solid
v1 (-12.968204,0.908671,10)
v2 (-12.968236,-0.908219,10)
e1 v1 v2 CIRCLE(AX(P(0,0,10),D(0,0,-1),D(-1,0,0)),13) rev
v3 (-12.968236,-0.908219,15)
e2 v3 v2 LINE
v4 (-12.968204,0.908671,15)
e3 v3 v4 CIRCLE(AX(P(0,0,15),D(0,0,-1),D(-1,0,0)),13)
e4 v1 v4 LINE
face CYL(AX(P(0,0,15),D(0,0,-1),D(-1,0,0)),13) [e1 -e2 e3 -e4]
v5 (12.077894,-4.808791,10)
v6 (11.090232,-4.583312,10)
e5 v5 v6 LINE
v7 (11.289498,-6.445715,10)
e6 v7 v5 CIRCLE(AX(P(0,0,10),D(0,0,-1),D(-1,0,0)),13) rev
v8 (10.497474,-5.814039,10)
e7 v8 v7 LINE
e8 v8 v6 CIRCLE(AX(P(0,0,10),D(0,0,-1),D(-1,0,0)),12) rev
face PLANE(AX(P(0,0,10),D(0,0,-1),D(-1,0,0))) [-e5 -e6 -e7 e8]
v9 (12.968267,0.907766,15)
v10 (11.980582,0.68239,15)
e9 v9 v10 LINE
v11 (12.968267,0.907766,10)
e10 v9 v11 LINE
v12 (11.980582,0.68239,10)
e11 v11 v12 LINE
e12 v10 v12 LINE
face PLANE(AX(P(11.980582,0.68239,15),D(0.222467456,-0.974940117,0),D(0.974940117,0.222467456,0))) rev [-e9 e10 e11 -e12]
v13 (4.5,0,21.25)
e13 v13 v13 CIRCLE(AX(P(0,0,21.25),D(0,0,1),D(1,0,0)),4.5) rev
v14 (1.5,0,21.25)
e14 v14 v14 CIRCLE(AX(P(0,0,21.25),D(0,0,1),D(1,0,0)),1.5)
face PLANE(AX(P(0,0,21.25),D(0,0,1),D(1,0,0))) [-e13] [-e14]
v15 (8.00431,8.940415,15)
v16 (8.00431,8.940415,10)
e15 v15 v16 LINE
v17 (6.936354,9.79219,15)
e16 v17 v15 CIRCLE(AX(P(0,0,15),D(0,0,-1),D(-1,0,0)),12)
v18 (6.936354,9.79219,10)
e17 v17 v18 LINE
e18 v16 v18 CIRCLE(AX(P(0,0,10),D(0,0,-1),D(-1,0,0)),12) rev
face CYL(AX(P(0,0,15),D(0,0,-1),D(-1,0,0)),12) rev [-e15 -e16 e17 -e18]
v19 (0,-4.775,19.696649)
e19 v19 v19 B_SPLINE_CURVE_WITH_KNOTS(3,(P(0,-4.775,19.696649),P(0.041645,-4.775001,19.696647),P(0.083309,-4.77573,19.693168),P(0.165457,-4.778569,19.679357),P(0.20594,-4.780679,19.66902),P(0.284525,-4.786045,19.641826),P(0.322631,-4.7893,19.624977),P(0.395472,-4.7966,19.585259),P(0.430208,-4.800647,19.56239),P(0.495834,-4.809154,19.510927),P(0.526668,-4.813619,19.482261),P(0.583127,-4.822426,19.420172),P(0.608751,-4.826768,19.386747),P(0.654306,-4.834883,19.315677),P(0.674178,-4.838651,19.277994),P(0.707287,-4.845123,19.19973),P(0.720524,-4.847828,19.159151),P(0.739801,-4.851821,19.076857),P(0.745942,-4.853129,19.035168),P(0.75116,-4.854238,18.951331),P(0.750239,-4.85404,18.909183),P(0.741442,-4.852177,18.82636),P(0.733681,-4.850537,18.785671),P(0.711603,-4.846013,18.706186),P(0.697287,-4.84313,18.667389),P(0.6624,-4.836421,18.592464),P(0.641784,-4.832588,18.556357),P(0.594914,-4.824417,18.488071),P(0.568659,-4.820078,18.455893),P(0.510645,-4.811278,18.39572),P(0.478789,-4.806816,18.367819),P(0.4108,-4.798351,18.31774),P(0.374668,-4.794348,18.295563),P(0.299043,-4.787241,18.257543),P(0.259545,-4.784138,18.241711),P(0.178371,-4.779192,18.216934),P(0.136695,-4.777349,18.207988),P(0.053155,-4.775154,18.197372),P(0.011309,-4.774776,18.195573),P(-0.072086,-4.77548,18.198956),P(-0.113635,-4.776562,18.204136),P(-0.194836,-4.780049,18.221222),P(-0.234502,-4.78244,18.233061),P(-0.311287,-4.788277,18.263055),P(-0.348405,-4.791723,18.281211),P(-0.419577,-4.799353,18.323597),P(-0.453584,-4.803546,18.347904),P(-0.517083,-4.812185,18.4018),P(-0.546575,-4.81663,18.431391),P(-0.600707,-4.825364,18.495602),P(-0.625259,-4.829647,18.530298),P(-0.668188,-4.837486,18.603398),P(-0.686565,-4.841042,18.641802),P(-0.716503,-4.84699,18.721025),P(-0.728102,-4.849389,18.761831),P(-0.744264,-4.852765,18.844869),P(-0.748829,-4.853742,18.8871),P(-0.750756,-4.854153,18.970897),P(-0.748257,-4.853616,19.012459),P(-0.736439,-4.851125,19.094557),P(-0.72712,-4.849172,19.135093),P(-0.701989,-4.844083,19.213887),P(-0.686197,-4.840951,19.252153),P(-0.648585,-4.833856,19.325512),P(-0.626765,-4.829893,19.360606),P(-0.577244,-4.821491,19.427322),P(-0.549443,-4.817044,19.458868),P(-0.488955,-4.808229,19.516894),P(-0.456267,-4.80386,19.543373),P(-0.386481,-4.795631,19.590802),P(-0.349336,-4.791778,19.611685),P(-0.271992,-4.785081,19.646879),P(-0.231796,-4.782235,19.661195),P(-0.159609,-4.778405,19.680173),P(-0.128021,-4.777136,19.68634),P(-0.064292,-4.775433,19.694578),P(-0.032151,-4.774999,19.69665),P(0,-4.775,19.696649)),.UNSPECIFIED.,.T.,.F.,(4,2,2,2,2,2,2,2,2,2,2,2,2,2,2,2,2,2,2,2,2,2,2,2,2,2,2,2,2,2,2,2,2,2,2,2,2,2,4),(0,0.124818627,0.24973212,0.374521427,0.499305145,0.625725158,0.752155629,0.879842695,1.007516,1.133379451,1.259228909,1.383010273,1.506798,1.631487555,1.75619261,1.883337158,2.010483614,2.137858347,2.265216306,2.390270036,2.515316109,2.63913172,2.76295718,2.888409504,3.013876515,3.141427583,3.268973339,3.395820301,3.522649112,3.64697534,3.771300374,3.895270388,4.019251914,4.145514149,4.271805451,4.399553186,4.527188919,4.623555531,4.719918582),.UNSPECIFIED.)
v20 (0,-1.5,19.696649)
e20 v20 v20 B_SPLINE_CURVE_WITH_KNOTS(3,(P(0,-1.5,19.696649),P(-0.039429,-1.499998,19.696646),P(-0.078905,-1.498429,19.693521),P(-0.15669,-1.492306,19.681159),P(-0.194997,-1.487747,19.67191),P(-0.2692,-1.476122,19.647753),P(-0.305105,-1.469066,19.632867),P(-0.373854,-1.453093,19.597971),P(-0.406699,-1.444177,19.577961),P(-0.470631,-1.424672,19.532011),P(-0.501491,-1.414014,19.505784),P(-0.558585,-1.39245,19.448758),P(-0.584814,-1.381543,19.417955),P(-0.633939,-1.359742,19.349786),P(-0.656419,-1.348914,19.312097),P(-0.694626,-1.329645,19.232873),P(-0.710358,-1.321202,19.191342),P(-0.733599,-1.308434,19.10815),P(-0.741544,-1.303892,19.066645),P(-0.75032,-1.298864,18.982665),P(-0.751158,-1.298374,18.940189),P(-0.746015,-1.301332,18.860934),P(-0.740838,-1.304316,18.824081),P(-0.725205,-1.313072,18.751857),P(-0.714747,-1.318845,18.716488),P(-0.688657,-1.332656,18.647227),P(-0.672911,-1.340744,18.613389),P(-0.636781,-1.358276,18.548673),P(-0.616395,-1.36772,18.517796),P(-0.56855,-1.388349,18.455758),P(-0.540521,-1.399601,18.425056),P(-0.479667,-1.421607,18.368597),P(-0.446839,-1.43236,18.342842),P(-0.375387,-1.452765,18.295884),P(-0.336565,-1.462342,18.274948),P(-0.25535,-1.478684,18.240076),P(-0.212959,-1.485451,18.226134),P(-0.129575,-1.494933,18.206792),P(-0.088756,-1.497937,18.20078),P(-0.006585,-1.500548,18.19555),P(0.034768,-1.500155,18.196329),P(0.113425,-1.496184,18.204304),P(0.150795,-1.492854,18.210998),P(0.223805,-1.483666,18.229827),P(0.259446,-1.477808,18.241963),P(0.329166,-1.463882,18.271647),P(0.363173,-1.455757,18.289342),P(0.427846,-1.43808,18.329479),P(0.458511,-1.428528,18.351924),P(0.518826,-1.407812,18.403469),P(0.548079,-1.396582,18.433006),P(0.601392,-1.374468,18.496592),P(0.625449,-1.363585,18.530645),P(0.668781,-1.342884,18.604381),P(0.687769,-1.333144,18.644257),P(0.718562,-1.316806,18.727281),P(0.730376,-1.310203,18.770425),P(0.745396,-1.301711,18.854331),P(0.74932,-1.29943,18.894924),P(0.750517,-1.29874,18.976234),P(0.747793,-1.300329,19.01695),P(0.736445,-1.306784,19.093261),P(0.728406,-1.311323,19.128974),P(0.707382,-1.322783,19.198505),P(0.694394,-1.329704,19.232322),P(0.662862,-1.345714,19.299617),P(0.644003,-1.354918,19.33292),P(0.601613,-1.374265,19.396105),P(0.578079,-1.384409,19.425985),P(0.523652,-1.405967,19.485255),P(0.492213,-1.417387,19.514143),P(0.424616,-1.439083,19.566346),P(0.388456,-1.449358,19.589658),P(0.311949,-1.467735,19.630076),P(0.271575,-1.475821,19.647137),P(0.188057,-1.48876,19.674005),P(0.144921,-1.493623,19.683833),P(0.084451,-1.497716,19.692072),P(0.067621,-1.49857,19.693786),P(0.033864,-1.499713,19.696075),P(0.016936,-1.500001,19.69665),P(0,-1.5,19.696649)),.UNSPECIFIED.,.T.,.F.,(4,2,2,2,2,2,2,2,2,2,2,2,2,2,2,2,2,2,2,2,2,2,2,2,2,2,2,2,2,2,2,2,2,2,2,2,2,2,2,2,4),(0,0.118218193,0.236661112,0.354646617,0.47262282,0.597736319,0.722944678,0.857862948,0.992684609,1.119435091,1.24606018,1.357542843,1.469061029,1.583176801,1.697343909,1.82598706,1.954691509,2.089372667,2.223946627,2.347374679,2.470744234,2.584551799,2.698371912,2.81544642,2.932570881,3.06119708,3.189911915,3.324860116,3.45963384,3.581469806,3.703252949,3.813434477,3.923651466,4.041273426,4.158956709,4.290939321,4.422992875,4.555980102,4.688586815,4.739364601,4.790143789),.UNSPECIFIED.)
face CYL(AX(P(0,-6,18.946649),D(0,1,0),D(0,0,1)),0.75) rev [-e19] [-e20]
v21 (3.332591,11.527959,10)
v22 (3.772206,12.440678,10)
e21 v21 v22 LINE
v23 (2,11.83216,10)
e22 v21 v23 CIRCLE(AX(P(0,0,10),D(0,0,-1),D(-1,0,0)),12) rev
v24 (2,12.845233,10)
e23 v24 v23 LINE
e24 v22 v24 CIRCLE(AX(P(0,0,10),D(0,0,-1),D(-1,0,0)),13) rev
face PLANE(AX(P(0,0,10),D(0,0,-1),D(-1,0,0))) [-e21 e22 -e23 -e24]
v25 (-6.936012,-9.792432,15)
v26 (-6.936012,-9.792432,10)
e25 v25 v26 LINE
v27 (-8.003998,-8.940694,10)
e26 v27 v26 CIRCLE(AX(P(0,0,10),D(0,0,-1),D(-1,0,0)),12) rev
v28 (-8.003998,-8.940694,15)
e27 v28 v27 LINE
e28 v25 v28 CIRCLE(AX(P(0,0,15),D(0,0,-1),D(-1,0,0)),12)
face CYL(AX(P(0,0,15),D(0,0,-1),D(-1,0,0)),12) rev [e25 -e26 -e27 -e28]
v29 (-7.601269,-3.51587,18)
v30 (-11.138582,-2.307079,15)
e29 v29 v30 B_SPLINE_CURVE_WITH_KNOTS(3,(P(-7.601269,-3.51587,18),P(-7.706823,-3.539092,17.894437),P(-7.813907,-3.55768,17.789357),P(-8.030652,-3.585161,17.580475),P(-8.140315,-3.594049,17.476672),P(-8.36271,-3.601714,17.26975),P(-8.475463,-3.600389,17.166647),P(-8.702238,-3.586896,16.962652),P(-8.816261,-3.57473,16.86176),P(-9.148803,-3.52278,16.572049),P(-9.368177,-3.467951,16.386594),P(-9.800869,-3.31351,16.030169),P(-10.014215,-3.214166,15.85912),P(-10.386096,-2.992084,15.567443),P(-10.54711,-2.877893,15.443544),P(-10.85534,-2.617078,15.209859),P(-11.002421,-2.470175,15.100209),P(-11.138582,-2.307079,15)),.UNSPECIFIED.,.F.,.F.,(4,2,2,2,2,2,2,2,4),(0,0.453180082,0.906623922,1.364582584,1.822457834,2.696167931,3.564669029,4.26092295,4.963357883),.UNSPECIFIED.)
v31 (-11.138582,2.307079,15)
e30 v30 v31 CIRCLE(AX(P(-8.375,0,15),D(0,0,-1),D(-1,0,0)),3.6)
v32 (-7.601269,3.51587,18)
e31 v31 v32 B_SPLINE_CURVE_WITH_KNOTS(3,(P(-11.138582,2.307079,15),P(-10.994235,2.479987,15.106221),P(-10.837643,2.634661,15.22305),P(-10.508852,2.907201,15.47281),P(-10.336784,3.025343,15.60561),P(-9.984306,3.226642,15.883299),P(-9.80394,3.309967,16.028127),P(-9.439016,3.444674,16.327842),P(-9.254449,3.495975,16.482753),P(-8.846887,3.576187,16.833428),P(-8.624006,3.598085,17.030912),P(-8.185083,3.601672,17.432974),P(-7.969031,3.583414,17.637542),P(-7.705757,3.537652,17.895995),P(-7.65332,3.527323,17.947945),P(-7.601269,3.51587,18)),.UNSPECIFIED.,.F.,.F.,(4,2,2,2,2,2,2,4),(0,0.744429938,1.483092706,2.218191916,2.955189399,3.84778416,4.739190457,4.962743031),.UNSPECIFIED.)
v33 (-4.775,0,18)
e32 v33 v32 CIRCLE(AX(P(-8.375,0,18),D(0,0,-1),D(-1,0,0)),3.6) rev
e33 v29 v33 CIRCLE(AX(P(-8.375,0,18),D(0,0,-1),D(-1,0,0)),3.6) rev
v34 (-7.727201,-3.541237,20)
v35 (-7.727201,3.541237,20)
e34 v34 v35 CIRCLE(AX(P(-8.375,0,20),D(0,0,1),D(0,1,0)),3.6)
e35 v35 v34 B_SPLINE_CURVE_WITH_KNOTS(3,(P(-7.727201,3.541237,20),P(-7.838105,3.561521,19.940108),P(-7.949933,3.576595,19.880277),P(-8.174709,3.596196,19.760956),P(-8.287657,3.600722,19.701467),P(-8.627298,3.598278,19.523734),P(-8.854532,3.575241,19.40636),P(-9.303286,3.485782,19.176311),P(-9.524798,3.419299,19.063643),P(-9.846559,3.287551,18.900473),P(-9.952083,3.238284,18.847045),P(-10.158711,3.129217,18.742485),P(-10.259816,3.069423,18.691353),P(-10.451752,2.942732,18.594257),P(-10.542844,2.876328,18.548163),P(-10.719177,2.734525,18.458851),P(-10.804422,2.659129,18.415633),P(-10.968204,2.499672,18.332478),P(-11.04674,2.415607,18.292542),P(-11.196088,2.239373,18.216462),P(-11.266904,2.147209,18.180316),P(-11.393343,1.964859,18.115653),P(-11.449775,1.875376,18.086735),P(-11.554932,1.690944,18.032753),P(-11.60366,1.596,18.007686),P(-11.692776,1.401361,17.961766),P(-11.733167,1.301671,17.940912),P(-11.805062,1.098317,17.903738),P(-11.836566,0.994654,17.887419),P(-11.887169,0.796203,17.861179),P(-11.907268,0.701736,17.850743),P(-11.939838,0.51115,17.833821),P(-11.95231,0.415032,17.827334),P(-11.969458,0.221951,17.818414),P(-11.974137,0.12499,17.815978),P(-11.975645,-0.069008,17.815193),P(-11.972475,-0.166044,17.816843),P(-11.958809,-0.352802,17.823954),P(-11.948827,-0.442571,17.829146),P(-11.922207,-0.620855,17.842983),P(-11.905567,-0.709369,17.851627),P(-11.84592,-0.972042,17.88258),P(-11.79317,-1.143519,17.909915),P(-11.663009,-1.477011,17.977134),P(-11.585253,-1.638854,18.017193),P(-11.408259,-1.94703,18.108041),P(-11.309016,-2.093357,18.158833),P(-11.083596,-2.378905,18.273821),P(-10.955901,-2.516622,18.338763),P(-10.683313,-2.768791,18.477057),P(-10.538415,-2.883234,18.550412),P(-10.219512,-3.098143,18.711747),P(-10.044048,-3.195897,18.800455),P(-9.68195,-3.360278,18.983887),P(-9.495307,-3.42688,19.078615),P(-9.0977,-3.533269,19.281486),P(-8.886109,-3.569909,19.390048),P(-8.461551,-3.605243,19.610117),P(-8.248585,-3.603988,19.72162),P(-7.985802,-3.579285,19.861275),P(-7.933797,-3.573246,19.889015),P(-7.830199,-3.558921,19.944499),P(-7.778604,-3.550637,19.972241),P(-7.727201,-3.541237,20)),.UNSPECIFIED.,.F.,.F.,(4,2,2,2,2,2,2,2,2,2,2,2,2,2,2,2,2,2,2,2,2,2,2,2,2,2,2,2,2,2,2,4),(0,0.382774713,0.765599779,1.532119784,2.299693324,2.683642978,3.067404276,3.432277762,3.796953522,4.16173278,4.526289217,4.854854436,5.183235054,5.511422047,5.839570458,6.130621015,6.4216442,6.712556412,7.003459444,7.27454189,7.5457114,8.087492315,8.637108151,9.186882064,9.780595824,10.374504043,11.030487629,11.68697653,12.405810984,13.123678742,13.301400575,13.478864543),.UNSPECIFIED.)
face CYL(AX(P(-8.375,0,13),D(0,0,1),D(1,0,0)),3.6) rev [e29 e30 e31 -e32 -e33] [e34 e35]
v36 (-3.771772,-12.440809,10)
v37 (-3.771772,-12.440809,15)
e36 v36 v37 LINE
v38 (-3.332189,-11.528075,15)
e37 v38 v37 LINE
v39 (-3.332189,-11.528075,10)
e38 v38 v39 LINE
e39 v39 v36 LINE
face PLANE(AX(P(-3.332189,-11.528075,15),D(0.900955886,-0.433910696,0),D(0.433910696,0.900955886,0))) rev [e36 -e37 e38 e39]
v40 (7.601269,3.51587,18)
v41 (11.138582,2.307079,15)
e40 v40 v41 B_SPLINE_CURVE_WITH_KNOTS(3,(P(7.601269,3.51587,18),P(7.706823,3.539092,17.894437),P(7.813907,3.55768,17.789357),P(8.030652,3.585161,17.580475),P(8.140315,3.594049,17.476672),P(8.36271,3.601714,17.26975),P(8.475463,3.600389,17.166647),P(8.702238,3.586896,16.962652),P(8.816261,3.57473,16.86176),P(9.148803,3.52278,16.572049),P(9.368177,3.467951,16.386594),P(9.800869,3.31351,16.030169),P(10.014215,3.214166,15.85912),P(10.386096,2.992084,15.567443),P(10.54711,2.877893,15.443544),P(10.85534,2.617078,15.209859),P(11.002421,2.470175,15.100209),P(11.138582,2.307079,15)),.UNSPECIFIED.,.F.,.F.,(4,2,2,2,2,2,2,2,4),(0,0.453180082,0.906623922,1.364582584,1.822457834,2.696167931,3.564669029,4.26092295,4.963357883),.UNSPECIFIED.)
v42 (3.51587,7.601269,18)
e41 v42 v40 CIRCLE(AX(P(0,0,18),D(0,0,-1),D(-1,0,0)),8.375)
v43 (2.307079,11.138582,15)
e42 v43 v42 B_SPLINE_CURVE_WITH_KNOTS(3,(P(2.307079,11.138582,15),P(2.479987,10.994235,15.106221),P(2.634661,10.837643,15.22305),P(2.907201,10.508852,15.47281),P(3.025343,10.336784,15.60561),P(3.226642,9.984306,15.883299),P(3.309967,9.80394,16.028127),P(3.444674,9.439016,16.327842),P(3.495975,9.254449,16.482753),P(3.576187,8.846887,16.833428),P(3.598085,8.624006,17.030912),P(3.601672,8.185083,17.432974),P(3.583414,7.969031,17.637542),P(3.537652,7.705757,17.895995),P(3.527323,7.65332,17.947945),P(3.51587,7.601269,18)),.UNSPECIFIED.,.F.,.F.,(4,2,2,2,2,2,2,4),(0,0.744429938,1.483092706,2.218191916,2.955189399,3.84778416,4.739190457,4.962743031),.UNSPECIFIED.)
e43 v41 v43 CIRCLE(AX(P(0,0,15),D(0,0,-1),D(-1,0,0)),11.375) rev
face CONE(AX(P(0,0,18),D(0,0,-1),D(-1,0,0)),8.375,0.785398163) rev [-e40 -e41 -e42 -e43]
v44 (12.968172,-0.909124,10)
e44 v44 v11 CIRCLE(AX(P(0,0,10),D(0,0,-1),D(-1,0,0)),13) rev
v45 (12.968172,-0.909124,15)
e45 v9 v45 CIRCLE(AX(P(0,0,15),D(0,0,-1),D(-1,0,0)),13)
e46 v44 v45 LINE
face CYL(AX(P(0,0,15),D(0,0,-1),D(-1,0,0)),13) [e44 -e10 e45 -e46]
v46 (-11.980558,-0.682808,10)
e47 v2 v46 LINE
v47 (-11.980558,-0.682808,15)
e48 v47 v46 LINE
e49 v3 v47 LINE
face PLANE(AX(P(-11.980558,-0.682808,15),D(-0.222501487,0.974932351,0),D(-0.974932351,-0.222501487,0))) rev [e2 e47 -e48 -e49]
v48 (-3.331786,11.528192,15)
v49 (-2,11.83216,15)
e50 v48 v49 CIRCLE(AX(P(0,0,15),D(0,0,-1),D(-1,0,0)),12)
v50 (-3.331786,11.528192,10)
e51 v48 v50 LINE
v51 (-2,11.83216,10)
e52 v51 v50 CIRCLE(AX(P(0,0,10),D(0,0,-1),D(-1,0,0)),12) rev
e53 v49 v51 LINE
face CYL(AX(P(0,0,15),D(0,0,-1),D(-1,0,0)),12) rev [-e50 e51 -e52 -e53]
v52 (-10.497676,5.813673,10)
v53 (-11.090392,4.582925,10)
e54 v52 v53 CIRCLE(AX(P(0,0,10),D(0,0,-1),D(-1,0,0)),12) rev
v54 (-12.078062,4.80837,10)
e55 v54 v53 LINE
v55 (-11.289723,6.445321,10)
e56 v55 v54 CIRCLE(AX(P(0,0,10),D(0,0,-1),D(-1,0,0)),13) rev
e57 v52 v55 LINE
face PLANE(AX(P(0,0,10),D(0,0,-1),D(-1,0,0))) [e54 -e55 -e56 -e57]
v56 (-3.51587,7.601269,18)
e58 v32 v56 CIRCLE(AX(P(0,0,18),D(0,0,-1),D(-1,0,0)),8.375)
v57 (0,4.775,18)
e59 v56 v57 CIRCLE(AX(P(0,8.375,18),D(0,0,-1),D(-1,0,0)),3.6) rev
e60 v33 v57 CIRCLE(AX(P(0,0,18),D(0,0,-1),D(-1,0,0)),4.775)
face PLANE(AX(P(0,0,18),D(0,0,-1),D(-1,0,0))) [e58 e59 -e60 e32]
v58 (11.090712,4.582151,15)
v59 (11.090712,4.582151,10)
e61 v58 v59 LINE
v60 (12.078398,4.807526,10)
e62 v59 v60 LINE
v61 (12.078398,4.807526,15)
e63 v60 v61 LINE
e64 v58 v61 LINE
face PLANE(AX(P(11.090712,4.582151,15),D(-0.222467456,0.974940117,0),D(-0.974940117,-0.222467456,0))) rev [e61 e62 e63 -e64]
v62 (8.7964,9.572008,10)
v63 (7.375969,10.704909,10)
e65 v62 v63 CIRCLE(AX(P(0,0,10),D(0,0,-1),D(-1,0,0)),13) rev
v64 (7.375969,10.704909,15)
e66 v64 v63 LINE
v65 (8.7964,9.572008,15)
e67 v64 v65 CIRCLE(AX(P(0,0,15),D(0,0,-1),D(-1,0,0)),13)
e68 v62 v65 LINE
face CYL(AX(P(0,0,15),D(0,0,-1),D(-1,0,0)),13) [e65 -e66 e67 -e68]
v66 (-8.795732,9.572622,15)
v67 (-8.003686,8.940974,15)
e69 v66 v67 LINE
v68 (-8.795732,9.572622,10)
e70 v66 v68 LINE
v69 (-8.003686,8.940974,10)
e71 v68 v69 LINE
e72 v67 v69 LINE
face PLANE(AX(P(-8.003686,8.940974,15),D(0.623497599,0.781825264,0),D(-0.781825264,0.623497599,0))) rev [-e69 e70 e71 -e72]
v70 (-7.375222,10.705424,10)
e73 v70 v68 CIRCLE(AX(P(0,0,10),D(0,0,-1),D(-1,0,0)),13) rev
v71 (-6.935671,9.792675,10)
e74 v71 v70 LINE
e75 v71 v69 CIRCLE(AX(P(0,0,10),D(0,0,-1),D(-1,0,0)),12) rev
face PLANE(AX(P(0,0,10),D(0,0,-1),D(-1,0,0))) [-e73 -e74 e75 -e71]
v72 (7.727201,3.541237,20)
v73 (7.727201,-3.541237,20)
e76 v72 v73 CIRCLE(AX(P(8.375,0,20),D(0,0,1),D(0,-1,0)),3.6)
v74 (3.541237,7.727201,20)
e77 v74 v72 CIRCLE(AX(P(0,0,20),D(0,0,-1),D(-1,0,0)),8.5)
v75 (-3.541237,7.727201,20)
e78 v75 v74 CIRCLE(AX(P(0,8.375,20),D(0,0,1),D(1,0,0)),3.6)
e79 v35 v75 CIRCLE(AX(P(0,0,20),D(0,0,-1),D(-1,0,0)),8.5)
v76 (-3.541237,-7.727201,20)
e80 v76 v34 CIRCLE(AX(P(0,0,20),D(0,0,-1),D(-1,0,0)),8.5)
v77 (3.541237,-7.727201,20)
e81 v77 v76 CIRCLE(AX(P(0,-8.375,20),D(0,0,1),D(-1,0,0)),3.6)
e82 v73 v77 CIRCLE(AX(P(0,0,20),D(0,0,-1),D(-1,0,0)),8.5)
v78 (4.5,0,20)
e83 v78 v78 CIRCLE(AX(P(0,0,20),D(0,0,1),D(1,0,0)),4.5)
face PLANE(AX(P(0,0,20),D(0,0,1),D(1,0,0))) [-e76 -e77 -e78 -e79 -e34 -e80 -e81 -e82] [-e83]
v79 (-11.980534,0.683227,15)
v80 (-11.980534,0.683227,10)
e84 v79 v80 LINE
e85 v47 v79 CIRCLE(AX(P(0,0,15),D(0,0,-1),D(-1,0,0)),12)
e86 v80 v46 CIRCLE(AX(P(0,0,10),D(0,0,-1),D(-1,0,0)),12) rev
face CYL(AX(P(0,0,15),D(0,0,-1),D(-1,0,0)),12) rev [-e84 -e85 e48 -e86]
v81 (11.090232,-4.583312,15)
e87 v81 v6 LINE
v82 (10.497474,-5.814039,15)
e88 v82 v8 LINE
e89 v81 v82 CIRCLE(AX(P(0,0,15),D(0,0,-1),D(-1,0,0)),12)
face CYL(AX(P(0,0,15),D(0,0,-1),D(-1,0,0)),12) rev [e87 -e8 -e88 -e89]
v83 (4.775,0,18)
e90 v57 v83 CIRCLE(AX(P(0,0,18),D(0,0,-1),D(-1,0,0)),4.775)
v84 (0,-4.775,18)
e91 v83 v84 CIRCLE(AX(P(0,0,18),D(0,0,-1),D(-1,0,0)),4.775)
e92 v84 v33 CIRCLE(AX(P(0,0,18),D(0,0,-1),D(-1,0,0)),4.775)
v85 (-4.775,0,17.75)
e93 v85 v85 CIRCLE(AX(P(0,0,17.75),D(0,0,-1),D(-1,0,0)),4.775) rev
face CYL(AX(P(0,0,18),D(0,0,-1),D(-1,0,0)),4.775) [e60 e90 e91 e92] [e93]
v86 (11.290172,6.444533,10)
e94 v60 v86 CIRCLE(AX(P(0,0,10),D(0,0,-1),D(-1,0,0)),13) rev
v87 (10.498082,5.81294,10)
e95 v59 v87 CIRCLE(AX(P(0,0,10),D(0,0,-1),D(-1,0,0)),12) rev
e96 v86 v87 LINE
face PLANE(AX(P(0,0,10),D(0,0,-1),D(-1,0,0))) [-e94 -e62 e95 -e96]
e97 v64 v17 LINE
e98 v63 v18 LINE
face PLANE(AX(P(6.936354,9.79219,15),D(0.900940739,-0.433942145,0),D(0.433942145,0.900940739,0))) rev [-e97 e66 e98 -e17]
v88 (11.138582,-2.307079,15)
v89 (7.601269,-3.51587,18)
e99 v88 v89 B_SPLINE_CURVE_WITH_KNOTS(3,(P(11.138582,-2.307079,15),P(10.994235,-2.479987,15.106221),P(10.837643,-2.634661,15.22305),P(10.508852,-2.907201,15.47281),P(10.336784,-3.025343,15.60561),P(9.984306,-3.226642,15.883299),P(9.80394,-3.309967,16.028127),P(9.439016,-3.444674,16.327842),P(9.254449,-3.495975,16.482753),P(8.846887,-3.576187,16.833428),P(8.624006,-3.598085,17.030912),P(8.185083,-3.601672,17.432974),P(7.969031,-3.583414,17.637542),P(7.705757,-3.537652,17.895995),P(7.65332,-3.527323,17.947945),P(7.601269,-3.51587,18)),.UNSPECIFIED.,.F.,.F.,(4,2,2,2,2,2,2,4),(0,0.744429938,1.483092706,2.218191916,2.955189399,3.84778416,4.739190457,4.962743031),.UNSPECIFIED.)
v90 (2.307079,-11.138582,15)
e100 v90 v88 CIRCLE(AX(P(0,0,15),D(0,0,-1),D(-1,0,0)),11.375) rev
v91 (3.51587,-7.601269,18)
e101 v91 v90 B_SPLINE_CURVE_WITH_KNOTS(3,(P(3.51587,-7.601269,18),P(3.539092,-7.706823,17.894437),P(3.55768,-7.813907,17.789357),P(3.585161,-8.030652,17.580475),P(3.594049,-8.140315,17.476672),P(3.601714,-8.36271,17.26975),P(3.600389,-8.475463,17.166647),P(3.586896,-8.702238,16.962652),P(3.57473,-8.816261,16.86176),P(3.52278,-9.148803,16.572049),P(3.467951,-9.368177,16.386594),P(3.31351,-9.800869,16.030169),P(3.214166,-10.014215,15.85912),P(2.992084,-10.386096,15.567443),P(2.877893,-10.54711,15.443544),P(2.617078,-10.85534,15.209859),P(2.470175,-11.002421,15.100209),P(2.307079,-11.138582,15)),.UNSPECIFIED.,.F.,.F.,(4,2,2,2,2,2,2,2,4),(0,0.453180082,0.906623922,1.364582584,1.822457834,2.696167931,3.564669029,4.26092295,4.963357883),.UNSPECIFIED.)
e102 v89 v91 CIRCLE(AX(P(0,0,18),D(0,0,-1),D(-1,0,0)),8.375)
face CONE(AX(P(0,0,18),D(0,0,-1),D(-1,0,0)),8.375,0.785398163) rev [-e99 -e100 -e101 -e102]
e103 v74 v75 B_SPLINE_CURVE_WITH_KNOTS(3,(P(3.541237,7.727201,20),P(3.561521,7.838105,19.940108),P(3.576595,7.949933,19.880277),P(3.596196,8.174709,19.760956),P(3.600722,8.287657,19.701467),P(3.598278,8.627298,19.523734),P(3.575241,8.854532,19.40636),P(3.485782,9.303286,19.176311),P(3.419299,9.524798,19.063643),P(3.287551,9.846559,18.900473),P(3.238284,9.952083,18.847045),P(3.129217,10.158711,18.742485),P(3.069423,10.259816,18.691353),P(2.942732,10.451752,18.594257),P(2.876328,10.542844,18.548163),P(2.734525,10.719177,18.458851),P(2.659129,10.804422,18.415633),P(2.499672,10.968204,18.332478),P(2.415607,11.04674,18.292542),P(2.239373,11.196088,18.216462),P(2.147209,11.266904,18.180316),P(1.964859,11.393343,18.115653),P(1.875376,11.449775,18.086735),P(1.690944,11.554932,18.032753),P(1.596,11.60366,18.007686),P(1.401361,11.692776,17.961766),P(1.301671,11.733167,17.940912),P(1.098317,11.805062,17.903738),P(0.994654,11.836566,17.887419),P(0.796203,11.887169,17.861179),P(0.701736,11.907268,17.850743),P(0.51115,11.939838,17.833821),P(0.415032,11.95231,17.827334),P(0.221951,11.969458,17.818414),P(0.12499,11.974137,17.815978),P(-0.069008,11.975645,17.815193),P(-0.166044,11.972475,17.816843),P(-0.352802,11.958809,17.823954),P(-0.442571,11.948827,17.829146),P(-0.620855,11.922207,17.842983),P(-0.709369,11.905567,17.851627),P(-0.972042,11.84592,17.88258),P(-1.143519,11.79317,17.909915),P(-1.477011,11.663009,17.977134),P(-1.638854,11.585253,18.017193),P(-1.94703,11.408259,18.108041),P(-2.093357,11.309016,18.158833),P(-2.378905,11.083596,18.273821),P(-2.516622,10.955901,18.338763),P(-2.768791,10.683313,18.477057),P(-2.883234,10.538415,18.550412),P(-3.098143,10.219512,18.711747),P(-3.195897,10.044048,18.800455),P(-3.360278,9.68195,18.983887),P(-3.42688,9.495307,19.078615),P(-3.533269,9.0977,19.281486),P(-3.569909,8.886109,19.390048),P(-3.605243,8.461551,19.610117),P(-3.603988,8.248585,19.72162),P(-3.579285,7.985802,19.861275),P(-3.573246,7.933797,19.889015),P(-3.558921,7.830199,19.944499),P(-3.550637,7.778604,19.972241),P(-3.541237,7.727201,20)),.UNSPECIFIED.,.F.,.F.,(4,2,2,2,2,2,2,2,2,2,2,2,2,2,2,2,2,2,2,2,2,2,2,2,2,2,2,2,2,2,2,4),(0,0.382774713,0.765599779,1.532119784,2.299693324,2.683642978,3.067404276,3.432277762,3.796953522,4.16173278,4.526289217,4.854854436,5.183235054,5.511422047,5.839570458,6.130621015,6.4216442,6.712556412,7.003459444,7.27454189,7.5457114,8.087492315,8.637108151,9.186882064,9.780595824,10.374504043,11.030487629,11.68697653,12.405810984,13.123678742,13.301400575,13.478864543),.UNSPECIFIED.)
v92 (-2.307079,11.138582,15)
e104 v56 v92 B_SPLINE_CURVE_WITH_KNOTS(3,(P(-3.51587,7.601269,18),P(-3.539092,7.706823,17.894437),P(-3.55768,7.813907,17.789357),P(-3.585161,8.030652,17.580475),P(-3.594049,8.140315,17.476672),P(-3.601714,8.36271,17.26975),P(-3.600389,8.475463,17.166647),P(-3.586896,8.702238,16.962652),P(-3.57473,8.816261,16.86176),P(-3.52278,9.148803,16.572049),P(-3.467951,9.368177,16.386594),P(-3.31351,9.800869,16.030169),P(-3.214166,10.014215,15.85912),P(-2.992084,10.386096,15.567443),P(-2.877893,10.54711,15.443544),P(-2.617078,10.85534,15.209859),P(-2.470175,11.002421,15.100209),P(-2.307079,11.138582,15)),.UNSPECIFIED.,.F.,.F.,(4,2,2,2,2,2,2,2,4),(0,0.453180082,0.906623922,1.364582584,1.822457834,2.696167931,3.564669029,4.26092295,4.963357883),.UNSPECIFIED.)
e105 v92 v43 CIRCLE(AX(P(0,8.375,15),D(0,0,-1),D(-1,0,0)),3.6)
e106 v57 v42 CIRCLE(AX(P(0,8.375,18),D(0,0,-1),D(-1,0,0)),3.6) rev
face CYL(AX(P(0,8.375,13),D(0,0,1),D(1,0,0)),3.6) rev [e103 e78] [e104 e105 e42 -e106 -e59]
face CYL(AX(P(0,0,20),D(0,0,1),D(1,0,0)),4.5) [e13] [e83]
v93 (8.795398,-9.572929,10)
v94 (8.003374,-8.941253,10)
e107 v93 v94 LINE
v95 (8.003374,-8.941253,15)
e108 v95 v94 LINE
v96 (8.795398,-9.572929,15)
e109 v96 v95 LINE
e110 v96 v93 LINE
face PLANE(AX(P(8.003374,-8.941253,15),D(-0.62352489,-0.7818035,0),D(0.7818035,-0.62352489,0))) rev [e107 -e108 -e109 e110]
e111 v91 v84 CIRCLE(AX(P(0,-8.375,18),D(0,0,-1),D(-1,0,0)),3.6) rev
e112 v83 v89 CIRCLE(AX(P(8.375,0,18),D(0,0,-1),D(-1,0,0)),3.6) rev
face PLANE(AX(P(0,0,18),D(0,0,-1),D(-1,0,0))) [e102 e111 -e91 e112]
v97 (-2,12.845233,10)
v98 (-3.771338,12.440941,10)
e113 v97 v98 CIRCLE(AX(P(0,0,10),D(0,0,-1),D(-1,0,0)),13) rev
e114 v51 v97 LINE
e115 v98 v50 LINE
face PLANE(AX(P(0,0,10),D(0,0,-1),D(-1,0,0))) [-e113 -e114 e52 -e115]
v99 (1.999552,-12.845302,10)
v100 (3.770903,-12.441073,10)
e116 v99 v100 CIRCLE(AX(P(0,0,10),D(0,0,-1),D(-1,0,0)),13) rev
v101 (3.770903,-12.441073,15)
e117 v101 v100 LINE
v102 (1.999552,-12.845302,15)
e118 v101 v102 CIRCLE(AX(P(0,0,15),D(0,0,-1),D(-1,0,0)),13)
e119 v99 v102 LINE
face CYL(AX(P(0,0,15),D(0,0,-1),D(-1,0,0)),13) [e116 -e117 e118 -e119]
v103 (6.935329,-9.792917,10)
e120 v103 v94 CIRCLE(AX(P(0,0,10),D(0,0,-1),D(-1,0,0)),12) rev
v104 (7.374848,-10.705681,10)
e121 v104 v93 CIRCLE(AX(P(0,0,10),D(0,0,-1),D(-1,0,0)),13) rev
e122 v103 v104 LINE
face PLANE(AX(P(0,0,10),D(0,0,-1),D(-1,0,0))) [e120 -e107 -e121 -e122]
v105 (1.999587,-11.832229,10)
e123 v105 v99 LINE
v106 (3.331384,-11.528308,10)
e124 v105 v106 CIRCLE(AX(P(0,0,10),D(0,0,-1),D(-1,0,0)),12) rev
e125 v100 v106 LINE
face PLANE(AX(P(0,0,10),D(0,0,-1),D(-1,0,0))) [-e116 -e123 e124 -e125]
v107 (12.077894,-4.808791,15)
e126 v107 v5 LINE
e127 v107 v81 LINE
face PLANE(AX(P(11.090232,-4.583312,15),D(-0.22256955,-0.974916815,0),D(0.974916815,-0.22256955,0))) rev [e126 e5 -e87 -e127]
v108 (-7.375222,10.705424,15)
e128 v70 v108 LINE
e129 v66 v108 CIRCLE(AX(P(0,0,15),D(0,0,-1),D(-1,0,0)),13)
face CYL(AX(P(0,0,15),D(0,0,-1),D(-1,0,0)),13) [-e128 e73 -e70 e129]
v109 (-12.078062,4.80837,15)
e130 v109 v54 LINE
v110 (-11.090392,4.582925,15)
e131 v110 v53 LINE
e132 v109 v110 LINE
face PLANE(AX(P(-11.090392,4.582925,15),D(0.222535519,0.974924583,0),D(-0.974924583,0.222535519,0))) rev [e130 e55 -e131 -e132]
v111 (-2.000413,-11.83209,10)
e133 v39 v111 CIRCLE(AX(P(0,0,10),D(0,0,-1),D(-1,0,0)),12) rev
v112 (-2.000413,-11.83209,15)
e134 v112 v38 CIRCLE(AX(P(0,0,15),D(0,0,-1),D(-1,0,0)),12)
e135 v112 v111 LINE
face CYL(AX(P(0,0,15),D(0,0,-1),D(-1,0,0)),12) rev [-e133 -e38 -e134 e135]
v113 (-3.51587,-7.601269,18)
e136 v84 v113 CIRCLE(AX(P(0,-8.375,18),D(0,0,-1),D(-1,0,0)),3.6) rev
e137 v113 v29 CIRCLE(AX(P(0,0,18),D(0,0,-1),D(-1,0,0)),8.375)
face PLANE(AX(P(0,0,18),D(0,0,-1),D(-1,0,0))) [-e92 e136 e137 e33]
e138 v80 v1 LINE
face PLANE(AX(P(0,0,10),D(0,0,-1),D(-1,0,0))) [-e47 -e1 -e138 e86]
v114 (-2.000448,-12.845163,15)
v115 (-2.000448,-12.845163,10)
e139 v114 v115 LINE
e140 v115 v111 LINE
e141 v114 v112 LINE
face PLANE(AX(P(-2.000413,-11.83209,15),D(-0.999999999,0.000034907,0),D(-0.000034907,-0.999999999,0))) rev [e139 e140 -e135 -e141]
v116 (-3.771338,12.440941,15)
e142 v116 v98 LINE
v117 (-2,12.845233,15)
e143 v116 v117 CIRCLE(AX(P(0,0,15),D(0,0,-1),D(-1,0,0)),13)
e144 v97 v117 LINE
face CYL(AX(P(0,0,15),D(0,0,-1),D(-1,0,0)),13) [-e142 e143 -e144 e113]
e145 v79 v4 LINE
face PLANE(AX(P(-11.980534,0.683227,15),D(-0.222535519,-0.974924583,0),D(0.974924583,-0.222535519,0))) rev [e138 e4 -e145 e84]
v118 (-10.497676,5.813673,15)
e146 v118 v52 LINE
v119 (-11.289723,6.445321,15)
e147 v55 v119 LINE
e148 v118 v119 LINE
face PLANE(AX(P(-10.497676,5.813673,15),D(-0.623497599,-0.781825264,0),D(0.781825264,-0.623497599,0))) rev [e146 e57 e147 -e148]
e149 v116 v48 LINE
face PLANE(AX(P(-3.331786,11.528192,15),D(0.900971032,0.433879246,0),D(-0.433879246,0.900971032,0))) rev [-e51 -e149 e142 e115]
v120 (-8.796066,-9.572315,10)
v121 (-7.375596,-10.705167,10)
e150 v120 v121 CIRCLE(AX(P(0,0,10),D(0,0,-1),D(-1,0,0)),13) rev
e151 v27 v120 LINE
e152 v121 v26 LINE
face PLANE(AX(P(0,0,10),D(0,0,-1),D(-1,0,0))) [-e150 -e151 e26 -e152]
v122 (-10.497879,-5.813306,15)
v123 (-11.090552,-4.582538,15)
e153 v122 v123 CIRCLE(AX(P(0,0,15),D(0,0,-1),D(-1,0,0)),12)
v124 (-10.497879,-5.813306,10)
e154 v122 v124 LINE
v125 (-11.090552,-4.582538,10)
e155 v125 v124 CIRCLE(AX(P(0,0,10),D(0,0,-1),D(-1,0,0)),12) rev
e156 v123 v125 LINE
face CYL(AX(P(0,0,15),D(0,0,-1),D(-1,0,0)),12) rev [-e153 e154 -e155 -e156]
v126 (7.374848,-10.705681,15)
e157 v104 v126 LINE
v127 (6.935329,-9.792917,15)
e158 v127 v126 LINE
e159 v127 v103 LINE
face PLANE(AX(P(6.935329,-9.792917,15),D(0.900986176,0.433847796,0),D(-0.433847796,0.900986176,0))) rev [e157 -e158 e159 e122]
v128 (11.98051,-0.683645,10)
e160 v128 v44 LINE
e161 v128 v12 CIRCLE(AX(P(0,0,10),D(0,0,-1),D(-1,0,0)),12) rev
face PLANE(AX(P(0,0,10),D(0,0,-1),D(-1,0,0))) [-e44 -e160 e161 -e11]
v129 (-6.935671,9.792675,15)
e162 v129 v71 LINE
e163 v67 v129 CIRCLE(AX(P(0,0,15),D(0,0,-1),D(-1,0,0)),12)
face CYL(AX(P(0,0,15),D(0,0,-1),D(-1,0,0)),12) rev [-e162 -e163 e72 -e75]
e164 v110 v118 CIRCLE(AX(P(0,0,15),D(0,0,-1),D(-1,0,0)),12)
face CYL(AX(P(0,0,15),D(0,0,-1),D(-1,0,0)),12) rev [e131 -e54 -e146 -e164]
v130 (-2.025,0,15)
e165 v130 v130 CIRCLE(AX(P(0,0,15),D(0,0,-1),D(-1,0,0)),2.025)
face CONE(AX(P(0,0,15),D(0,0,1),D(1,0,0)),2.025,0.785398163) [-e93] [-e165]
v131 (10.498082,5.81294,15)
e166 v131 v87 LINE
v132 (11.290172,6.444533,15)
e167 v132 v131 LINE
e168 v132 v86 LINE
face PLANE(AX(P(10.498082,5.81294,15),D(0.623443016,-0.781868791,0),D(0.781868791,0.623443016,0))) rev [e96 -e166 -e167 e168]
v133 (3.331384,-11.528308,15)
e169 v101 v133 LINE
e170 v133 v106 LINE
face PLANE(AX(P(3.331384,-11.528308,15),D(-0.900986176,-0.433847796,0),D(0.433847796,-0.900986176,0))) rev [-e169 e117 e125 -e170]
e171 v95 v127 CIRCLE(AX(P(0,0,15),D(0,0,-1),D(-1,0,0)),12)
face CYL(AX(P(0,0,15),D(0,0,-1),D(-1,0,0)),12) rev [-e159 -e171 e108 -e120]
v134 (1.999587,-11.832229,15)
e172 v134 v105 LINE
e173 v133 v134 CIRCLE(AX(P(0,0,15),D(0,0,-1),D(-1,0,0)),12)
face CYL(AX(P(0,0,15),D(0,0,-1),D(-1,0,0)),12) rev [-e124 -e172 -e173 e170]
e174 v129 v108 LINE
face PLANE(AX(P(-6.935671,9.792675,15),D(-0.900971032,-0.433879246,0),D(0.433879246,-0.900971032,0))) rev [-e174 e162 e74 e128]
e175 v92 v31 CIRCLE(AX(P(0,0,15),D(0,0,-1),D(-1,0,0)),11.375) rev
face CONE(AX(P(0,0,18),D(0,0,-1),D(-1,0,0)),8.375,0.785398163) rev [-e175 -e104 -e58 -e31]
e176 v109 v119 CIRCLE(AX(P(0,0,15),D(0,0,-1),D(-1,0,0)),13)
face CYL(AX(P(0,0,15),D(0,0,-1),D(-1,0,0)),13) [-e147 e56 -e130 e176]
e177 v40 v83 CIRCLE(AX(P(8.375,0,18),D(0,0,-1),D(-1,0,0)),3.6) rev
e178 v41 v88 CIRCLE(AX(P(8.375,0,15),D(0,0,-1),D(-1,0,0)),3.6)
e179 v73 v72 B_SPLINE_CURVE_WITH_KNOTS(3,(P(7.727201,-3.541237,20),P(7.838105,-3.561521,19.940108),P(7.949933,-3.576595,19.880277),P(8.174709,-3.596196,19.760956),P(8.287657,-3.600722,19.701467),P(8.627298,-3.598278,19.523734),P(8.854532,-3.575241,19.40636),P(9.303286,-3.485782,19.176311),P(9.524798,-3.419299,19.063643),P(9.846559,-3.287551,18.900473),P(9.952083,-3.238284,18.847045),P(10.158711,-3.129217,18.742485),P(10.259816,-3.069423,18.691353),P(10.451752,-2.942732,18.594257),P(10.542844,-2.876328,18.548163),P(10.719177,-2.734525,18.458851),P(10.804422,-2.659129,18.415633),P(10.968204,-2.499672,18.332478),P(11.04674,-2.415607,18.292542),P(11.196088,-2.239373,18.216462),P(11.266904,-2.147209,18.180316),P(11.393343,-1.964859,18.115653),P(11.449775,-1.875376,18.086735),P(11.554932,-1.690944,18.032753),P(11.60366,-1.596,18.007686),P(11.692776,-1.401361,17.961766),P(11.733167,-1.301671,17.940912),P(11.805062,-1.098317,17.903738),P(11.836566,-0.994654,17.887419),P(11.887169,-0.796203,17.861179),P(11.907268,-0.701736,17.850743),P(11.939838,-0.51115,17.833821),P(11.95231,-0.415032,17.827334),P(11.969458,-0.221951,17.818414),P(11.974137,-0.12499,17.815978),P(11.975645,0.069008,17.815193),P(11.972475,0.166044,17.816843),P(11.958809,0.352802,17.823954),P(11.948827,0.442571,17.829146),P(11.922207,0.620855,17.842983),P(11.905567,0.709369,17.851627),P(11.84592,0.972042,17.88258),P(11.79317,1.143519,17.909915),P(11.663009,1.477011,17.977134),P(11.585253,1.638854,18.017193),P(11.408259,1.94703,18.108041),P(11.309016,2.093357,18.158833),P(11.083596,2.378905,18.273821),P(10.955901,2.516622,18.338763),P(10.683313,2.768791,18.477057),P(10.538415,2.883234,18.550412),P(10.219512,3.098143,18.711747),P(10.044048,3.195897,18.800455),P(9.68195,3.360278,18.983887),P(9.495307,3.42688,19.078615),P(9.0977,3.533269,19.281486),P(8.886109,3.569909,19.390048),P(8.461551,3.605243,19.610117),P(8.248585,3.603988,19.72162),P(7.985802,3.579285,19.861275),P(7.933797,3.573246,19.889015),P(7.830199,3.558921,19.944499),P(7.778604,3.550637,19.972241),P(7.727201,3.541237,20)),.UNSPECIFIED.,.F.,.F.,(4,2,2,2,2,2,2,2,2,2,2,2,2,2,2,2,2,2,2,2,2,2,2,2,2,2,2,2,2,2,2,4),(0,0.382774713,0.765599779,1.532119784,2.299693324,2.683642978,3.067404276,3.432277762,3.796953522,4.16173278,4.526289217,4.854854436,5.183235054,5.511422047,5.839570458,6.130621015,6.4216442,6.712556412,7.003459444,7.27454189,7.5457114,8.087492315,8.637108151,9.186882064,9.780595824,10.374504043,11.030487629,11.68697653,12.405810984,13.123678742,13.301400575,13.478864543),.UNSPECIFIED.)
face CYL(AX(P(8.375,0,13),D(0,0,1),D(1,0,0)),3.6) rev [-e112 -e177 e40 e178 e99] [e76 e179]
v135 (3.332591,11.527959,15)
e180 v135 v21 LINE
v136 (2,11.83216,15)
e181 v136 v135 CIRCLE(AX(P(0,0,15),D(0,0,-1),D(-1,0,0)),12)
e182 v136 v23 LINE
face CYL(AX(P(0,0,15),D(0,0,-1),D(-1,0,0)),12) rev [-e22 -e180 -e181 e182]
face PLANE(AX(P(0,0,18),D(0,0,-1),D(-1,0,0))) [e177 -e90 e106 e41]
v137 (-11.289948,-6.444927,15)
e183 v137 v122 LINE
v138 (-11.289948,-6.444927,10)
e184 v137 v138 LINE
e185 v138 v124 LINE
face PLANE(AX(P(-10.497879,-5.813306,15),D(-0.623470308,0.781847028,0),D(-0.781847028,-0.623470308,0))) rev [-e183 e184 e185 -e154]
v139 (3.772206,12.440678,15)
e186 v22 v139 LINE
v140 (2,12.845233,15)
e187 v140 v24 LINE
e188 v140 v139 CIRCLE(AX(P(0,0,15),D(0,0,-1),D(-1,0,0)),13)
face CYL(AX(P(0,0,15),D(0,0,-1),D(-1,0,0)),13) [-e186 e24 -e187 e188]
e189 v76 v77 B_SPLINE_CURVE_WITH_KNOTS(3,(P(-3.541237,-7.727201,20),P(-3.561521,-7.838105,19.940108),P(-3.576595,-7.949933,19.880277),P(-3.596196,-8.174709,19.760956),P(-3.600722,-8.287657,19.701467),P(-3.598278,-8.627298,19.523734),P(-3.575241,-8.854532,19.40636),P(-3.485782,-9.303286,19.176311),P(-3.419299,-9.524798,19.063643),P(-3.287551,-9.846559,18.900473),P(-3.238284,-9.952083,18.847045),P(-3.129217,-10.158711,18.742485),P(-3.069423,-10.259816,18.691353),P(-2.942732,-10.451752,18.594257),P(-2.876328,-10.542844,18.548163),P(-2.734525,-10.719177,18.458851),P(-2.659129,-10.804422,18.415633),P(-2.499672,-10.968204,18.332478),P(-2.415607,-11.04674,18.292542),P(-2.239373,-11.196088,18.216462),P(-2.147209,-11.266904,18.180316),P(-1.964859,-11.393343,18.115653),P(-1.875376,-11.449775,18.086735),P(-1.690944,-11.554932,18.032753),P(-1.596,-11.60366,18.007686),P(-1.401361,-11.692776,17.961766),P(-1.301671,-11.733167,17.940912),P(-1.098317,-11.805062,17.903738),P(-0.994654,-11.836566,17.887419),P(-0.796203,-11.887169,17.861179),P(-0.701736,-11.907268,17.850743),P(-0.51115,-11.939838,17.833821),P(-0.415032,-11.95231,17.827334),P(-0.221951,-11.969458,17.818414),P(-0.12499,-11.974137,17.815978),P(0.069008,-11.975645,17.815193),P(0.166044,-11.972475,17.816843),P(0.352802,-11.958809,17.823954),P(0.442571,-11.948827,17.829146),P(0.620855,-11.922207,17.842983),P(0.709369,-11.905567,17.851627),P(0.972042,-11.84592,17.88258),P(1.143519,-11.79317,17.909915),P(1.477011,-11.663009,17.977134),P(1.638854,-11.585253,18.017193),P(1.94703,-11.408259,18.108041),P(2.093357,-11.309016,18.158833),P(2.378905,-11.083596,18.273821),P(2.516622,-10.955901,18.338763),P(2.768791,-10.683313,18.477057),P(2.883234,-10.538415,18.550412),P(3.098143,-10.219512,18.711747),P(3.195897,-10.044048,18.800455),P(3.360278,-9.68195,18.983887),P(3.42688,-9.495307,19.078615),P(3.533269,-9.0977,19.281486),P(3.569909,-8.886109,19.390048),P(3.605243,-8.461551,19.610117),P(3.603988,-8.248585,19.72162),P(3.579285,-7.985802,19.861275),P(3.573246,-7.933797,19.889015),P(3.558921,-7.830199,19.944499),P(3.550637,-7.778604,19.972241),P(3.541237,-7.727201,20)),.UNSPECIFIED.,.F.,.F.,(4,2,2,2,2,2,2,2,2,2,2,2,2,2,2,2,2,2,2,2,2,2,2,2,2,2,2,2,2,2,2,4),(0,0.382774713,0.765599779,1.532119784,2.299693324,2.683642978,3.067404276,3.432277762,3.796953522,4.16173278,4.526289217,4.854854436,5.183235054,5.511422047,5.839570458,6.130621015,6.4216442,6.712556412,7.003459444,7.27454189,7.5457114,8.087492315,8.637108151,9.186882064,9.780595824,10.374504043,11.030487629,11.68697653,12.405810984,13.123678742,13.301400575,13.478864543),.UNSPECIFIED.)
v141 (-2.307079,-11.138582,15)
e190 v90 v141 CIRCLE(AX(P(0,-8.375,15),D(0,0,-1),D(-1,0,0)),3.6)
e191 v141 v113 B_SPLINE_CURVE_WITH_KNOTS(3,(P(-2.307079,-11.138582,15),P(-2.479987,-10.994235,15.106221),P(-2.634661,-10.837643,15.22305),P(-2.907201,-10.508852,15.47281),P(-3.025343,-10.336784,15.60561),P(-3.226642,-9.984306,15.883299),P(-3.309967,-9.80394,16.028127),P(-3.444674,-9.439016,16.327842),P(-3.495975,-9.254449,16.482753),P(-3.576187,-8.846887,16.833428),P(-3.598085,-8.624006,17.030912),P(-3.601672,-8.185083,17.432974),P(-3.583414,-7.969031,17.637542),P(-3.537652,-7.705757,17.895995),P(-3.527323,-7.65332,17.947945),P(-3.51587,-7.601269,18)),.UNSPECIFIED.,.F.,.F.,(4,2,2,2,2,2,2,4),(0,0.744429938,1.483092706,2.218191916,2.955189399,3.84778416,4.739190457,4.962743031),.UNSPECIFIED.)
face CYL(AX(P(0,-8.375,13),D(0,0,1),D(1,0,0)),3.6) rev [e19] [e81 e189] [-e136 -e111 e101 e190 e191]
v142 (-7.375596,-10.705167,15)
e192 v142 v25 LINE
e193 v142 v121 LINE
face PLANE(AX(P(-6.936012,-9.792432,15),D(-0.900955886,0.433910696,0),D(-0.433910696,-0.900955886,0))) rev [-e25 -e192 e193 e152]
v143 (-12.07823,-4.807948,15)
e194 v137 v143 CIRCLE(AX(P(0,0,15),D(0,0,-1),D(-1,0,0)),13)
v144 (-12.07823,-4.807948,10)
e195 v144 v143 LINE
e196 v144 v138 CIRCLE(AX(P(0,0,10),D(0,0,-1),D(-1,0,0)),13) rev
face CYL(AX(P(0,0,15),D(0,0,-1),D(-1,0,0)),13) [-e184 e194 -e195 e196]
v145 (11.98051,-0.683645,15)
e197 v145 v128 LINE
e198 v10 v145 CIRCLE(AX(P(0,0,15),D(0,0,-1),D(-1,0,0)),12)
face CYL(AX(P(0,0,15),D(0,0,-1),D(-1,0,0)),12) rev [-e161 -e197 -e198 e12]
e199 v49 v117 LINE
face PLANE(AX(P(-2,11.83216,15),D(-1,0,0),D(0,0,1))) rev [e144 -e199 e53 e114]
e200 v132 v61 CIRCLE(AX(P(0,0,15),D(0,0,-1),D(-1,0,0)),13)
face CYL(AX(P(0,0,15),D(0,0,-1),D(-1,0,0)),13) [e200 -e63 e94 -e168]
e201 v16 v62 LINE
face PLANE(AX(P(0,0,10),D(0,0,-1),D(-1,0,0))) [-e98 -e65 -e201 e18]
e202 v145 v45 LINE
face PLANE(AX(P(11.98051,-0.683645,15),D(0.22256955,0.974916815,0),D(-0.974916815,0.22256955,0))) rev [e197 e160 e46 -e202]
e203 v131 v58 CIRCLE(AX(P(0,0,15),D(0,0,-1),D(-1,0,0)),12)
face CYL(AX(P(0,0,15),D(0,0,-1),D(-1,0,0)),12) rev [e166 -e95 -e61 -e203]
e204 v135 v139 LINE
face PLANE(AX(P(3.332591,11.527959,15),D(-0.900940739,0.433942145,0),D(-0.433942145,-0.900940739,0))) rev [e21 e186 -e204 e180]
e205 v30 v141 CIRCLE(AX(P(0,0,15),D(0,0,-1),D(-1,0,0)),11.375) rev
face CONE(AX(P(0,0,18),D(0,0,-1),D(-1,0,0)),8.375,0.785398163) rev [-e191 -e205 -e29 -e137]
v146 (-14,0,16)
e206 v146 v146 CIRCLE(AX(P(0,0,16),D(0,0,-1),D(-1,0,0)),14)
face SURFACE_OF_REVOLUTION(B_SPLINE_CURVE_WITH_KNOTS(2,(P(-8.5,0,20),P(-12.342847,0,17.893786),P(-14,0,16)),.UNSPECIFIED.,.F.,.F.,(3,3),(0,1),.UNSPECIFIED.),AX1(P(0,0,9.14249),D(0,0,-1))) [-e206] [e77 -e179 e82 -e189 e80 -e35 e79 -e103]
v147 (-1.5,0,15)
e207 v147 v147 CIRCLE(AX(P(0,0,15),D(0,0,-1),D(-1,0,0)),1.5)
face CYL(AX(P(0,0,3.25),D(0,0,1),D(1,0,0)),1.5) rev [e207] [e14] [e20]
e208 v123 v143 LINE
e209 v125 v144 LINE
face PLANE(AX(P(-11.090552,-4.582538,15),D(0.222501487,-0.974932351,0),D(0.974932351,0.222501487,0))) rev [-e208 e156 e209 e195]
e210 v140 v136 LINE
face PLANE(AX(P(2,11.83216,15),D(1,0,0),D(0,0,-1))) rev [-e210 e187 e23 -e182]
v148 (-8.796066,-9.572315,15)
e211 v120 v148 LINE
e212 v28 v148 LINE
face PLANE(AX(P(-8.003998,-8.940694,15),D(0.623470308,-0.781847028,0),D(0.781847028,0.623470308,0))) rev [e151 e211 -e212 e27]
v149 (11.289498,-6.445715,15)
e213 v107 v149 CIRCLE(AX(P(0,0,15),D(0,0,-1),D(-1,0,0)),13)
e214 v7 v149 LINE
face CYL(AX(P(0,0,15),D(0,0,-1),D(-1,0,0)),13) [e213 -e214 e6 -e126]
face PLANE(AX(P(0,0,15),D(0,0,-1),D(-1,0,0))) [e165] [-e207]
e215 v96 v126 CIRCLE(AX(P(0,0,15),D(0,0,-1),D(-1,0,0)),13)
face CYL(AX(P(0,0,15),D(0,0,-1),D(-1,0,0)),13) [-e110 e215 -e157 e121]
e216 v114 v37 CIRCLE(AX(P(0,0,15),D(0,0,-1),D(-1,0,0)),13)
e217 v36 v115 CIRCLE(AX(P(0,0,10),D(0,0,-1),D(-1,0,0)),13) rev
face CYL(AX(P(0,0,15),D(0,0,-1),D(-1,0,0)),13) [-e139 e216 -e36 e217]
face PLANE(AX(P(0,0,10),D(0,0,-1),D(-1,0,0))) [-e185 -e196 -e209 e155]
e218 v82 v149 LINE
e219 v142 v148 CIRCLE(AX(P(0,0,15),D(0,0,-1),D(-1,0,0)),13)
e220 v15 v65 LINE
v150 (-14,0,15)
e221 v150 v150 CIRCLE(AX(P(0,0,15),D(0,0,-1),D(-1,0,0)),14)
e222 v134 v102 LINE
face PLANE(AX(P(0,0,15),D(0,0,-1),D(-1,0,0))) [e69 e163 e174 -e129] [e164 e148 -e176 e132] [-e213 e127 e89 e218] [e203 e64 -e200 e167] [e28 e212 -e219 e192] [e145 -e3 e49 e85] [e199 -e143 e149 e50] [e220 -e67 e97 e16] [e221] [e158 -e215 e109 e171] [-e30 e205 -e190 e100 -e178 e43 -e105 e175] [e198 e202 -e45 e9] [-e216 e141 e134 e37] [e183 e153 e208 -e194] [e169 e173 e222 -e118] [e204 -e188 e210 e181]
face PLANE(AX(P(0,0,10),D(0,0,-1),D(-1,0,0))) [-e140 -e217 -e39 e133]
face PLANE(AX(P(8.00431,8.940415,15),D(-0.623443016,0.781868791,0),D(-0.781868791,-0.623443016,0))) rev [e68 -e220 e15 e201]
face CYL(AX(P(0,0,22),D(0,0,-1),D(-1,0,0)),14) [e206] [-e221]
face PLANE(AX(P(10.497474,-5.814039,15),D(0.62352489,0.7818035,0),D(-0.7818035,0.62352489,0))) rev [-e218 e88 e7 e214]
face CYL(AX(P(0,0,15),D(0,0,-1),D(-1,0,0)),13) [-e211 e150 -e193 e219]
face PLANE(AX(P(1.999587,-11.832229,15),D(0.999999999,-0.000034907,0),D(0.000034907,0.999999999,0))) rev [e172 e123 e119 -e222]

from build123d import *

# Parameters (mm, degrees)
SKETCH1_R           = 14
BOSS_EXTRUDE1_DEPTH = 22
SKETCH2_R           = 12
CUT_EXTRUDE1_DEPTH  = 15
SKETCH3_R           = 17.036826926
SKETCH3_R_2         = 13
CUT_EXTRUDE2_DEPTH  = 15
SKETCH4_R           = 15.163293939
CUT_EXTRUDE3_DEPTH  = 10
SKETCH5_R           = 16.994892588
SKETCH5_R_2         = 4.5
CUT_EXTRUDE4_DEPTH  = 2
SKETCH8_R           = 3.6
CUT_EXTRUDE5_DEPTH  = 7
CIRPATTERN1_COUNT   = 4
SKETCH11_R          = 5.620004384
CUT_EXTRUDE6_DEPTH  = 0.75
SKETCH12_R          = 1.5
CUT_EXTRUDE7_DEPTH  = 18
SKETCH13_R          = 8.375
SKETCH13_R_2        = 4.775
CUT_EXTRUDE8_DEPTH  = 3
FILLET1_SIZE        = 2.75
FILLET2_SIZE        = 3
SKETCH14_W          = 4
SKETCH14_H          = 4.217169846
CUT_EXTRUDE10_DEPTH = 5
CIRPATTERN3_COUNT   = 14
CIRPATTERN3_ANGLE   = 334.282
SKETCH16_R          = 0.75
CUT_EXTRUDE11_DEPTH = 6


with BuildPart() as part:
    # Sketch1 → Boss-Extrude1 (new body)
    with BuildSketch(Plane.XY):
        Circle(SKETCH1_R)
    extrude(amount=BOSS_EXTRUDE1_DEPTH)

    # Sketch2 → Cut-Extrude1 (cut)
    with BuildSketch(Plane(origin=(0, 0, 0), x_dir=(-1, 0, 0), z_dir=(0, 0, -1))):
        Circle(SKETCH2_R)
    extrude(amount=-CUT_EXTRUDE1_DEPTH, mode=Mode.SUBTRACT)

    # Sketch3 → Cut-Extrude2 (cut)
    with BuildSketch(Plane(origin=(0, 0, 0), x_dir=(-1, 0, 0), z_dir=(0, 0, -1))):
        Circle(SKETCH3_R)
        Circle(SKETCH3_R_2, mode=Mode.SUBTRACT)
    extrude(amount=-CUT_EXTRUDE2_DEPTH, mode=Mode.SUBTRACT)

    # Sketch4 → Cut-Extrude3 (cut)
    with BuildSketch(Plane(origin=(0, 0, 0), x_dir=(-1, 0, 0), z_dir=(0, 0, -1))):
        Circle(SKETCH4_R)
    extrude(amount=-CUT_EXTRUDE3_DEPTH, mode=Mode.SUBTRACT)

    # Sketch5 → Cut-Extrude4 (cut)
    with BuildSketch(Plane.XY.offset(22)):
        Circle(SKETCH5_R)
        Circle(SKETCH5_R_2, mode=Mode.SUBTRACT)
    extrude(amount=-CUT_EXTRUDE4_DEPTH, mode=Mode.SUBTRACT)

    # Sketch8 → Cut-Extrude5 (cut)
    with BuildSketch(Plane.XY.offset(20)):
        with Locations((0, 8.375)):
            Circle(SKETCH8_R)
    cut_extrude5 = extrude(amount=-CUT_EXTRUDE5_DEPTH, mode=Mode.SUBTRACT)

    # CirPattern1: Cut-Extrude5 ×4 about axis
    cirpattern1_axis = Axis((0, 0, 0), (0, 0, 1))
    for i in range(1, CIRPATTERN1_COUNT):
        add(cut_extrude5.rotate(cirpattern1_axis, i * 360 / CIRPATTERN1_COUNT), mode=Mode.SUBTRACT)

    # Sketch7 → Cut-Revolve2 (revolve, cut)
    with BuildSketch(Plane(origin=(0, 0, 0), x_dir=(1, 0, 0), z_dir=(0, 1, 0))):
        with BuildLine():
            Line((-14, -16), (-16.211067118, -22.850526422))
            Line((-16.211067118, -22.850526422), (-8.5, -20))
            add(Edge.make_bspline(
                [(-8.5, -20), (-12.342847144, -17.893785877), (-14, -16)],
                knots=[0, 0, 0, 1, 1, 1], degree=2))
        make_face()
    revolve(axis=Axis((0, 0, 9.142490177), (0, 0, 1)), mode=Mode.SUBTRACT)

    # Sketch11 → Cut-Extrude6 (cut)
    with BuildSketch(Plane.XY.offset(22)):
        Circle(SKETCH11_R)
    extrude(amount=-CUT_EXTRUDE6_DEPTH, mode=Mode.SUBTRACT)

    # Sketch12 → Cut-Extrude7 (cut)
    with BuildSketch(Plane.XY.offset(21.25)):
        Circle(SKETCH12_R)
    extrude(amount=-CUT_EXTRUDE7_DEPTH, mode=Mode.SUBTRACT)

    # Sketch13 → Cut-Extrude8 (cut)
    with BuildSketch(Plane(origin=(0, 0, 15), x_dir=(-1, 0, 0), z_dir=(0, 0, -1))):
        Circle(SKETCH13_R)
        Circle(SKETCH13_R_2, mode=Mode.SUBTRACT)
    extrude(amount=-CUT_EXTRUDE8_DEPTH, mode=Mode.SUBTRACT)

    # Fillet1
    fillet1_edges = [part.edges().sort_by_distance(p)[0] for p in [
        (4.775, 0, 15),
    ]]
    chamfer(fillet1_edges, length=FILLET1_SIZE)

    # Fillet2
    # the kernel refuses this chamfer: 3 mm, written as the material it takes off along each edge
    with BuildSketch(Plane(origin=(0, 0, 15), x_dir=(-0.4688986407455129, 0.8832519825661364, 0), z_dir=(-0.8832519825661364, -0.4688986407455129, 0))) as fillet2_piece_1_section:
        Polygon((8.375, -FILLET2_SIZE), (8.375 + FILLET2_SIZE, 0), (8.375, 0), align=None)
    fillet2_piece_1 = revolve(axis=Axis((0, 0, 15), (0, 0, -1)), revolution_arc=145.925657294, mode=Mode.PRIVATE)
    fillet2_piece_1 = split(fillet2_piece_1, bisect_by=Plane(origin=(6.988160105, 6.988160105, 18), z_dir=(0, 0, -1)), keep=Keep.TOP, mode=Mode.PRIVATE)
    add(fillet2_piece_1, mode=Mode.SUBTRACT)
    with BuildSketch(Plane(origin=(0, 0, 15), x_dir=(0.4688986407455169, -0.8832519825661342, 0), z_dir=(0.8832519825661342, 0.4688986407455169, 0))) as fillet2_piece_2_section:
        Polygon((8.375, -FILLET2_SIZE), (8.375 + FILLET2_SIZE, 0), (8.375, 0), align=None)
    fillet2_piece_2 = revolve(axis=Axis((0, 0, 15), (0, 0, -1)), revolution_arc=145.925657294, mode=Mode.PRIVATE)
    fillet2_piece_2 = split(fillet2_piece_2, bisect_by=Plane(origin=(-6.988160104, -6.988160104, 18), z_dir=(0, 0, -1)), keep=Keep.TOP, mode=Mode.PRIVATE)
    add(fillet2_piece_2, mode=Mode.SUBTRACT)
    with BuildSketch(Plane(origin=(0, 0, 15), x_dir=(0.8832519825661352, 0.4688986407455149, 0), z_dir=(-0.4688986407455149, 0.8832519825661352, 0))) as fillet2_piece_3_section:
        Polygon((8.375, -FILLET2_SIZE), (8.375 + FILLET2_SIZE, 0), (8.375, 0), align=None)
    fillet2_piece_3 = revolve(axis=Axis((0, 0, 15), (0, 0, -1)), revolution_arc=145.925657294, mode=Mode.PRIVATE)
    fillet2_piece_3 = split(fillet2_piece_3, bisect_by=Plane(origin=(6.988160105, -6.988160105, 18), z_dir=(0, 0, -1)), keep=Keep.TOP, mode=Mode.PRIVATE)
    add(fillet2_piece_3, mode=Mode.SUBTRACT)
    with BuildSketch(Plane(origin=(0, 0, 15), x_dir=(-0.8832519825661325, -0.46889864074552023, 0), z_dir=(0.46889864074552023, -0.8832519825661325, 0))) as fillet2_piece_4_section:
        Polygon((8.375, -FILLET2_SIZE), (8.375 + FILLET2_SIZE, 0), (8.375, 0), align=None)
    fillet2_piece_4 = revolve(axis=Axis((0, 0, 15), (0, 0, -1)), revolution_arc=145.925657294, mode=Mode.PRIVATE)
    fillet2_piece_4 = split(fillet2_piece_4, bisect_by=Plane(origin=(-6.988160105, 6.988160105, 18), z_dir=(0, 0, -1)), keep=Keep.TOP, mode=Mode.PRIVATE)
    add(fillet2_piece_4, mode=Mode.SUBTRACT)

    # Sketch14 → Cut-Extrude10 (cut)
    with BuildSketch(Plane(origin=(0, 0, 10), x_dir=(-1, 0, 0), z_dir=(0, 0, -1))):
        with Locations((0, 13.940744489)):
            Rectangle(SKETCH14_W, SKETCH14_H)
    cut_extrude10 = extrude(amount=-CUT_EXTRUDE10_DEPTH, mode=Mode.SUBTRACT)

    # CirPattern3: Cut-Extrude10 ×14 about axis
    cirpattern3_axis = Axis((0, 0, 0), (0, 0, 1))
    for i in range(1, CIRPATTERN3_COUNT):
        add(cut_extrude10.rotate(cirpattern3_axis, i * CIRPATTERN3_ANGLE / (CIRPATTERN3_COUNT - 1)), mode=Mode.SUBTRACT)

    # Sketch16 → Cut-Extrude11 (cut)
    with BuildSketch(Plane(origin=(0, 0, 0), x_dir=(1, 0, 0), z_dir=(0, 1, 0))):
        with Locations(Location((0, -18.946648634, 0), (0, 0, 270))):
            Circle(SKETCH16_R)
    extrude(amount=-CUT_EXTRUDE11_DEPTH, mode=Mode.SUBTRACT)


solid = part.part
